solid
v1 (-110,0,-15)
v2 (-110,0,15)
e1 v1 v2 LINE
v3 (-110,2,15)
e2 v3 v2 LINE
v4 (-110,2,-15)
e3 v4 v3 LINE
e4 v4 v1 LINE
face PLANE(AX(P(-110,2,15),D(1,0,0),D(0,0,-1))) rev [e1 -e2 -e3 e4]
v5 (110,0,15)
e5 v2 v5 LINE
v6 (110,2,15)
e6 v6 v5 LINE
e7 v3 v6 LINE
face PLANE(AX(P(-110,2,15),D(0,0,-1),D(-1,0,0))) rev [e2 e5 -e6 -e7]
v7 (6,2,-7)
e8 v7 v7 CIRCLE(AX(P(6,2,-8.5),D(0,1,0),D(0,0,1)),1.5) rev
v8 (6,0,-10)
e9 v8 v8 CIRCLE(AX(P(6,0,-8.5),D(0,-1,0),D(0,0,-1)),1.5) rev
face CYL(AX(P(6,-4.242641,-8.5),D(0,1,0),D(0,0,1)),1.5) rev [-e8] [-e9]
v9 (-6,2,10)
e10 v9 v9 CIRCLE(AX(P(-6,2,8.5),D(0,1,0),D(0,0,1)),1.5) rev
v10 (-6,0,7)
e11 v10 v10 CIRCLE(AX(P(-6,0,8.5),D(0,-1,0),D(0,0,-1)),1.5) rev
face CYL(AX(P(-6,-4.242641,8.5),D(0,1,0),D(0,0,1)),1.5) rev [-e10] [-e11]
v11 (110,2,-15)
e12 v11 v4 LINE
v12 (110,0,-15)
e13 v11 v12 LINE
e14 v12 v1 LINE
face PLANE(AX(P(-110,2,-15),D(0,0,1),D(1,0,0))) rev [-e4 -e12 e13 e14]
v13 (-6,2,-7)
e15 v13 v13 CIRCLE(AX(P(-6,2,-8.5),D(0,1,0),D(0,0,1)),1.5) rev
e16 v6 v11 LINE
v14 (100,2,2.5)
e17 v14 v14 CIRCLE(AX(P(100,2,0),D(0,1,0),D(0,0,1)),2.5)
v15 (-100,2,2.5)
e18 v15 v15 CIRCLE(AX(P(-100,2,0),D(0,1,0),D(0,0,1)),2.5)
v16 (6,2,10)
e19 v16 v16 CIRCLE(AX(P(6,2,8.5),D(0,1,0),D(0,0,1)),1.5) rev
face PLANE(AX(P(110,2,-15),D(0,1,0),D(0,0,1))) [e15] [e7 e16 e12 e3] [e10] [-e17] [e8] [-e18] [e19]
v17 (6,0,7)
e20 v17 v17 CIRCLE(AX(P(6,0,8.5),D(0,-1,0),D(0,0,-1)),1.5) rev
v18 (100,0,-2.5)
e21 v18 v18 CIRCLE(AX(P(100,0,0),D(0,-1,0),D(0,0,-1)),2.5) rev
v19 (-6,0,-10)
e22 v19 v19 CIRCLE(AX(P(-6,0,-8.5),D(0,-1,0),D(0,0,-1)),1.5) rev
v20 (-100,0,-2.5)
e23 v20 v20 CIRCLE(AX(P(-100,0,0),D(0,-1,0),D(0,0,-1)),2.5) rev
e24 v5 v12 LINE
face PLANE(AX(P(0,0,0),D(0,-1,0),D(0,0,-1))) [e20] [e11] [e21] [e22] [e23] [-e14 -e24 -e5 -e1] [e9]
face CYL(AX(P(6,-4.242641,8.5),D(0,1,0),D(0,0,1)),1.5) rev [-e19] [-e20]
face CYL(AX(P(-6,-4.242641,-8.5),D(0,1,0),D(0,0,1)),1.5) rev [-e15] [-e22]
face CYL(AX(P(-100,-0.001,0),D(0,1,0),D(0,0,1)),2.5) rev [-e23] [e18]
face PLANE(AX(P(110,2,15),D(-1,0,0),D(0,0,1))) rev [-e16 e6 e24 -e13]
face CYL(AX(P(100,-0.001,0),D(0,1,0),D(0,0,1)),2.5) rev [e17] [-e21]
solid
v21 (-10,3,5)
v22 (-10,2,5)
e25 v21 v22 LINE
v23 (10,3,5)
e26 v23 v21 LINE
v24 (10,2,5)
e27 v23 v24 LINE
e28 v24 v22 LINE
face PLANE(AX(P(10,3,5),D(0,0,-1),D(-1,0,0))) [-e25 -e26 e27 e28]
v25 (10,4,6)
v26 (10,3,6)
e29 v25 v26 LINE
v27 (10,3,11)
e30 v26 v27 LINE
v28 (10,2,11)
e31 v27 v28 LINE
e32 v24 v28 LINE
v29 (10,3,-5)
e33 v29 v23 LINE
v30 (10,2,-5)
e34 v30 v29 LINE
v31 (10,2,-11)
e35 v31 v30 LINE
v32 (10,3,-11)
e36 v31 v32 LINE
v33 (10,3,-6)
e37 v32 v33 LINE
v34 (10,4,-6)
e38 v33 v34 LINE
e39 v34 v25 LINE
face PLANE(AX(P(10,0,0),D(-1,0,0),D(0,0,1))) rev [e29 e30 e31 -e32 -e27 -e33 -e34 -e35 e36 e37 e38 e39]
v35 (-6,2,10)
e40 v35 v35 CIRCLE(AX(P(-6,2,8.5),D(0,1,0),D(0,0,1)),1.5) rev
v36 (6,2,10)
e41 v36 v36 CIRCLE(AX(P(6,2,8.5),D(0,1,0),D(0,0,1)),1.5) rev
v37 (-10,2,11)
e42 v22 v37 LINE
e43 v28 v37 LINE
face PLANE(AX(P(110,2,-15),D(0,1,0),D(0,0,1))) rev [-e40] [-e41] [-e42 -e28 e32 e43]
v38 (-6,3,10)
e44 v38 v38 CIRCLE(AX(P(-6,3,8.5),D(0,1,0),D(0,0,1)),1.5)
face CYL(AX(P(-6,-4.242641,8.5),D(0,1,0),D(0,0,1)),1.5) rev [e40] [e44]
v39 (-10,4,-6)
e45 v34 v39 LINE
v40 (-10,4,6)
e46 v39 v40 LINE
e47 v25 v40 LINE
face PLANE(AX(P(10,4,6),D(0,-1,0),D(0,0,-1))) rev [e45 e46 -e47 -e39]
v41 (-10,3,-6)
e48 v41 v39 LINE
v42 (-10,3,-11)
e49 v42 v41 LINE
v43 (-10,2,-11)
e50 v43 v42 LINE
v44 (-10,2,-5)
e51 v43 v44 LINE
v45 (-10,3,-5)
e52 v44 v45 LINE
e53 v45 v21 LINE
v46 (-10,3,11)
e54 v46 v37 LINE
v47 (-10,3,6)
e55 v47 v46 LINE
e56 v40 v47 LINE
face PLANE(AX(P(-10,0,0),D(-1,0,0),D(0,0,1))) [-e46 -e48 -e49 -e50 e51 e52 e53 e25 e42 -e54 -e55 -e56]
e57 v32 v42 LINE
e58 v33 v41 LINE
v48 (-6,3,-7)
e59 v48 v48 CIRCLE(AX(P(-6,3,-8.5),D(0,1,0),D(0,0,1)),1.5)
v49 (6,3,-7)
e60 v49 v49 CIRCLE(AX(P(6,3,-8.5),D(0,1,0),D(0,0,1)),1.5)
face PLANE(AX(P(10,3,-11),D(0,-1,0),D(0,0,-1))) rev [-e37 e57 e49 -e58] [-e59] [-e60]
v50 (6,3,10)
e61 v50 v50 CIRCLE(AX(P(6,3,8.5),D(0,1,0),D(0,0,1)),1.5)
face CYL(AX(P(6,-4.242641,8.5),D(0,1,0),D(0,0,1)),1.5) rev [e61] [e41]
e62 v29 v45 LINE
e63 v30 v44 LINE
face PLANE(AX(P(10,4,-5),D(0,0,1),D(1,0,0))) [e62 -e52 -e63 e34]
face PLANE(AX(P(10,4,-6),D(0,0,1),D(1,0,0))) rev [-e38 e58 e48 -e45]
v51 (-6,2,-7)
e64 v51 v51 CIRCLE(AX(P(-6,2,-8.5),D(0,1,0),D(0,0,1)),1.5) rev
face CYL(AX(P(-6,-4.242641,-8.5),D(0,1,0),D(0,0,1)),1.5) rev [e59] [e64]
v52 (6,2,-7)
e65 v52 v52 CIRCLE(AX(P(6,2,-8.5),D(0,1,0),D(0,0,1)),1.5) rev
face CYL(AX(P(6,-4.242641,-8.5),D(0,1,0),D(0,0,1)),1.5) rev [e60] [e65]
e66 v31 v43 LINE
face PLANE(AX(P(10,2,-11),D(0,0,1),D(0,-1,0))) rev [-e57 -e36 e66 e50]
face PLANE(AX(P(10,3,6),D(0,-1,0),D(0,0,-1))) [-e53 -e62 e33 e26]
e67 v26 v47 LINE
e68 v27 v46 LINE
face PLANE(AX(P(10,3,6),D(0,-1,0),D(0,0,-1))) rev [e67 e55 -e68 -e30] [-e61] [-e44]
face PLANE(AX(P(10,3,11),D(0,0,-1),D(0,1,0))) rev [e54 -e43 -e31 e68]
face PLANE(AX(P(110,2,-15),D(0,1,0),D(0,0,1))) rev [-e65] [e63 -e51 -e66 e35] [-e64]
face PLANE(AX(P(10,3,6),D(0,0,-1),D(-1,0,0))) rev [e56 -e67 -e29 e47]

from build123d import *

# Parameters (mm, degrees)
SKETCH_1_W          = 220
SKETCH_1_H          = 30
EXTRUDE_1_DEPTH     = 2
EXTRUDE_START       = -10
EXTRUDE_1_2_DEPTH   = 20
SKETCH_3_R          = 1.5
CUT_EXTRUDE_1_DEPTH = 3
SKETCH_4_R          = 2.5
CUT_EXTRUDE_2_DEPTH = 2


# Read off the part's stored shape, not the designer's step: 拉伸-薄壁1, 分割1
with BuildPart() as part:
    # 草图1 → Extrude 1 (new body)
    with BuildSketch(Plane(origin=(0, 0, 0), x_dir=(1, 0, 0), z_dir=(0, 1, 0))):
        Rectangle(SKETCH_1_W, SKETCH_1_H)
    extrude(amount=EXTRUDE_1_DEPTH)

    # Extrude 1 2 outline → Extrude 1 2 (add)
    with BuildSketch(Plane(origin=(0, 0, 0), x_dir=(0, 0, -1), z_dir=(1, 0, 0)).offset(EXTRUDE_START)):
        Polygon((-11, 3), (-11, 2), (-5, 2), (-5, 3), (5, 3), (5, 2), (11, 2), (11, 3), (6, 3), (6, 4), (-6, 4), (-6, 3), align=None)
    extrude(amount=EXTRUDE_1_2_DEPTH)

    # 草图3 → 切除-拉伸1 (cut)
    with BuildSketch(Plane(origin=(0, 3, 0), x_dir=(1, 0, 0), z_dir=(0, 1, 0))):
        with Locations(Location((-6, 8.5, 0), (0, 0, 270))):
            Circle(SKETCH_3_R)
        with Locations(Location((6, 8.5, 0), (0, 0, 270))):
            Circle(SKETCH_3_R)
        with Locations(Location((-6, -8.5, 0), (0, 0, 270))):
            Circle(SKETCH_3_R)
        with Locations(Location((6, -8.5, 0), (0, 0, 270))):
            Circle(SKETCH_3_R)
    extrude(amount=-CUT_EXTRUDE_1_DEPTH, mode=Mode.SUBTRACT)


with BuildPart() as body_2:
    # Split Bodies 1: the piece on the far side of the plane
    add(part.part)
    split(bisect_by=Plane(origin=(0, 2, 0), x_dir=(1, 0, 0), z_dir=(0, 1, 0)), keep=Keep.BOTTOM)

    # 草图4 → 切除-拉伸2 (cut)
    with BuildSketch(Plane(origin=(0, 2, 0), x_dir=(1, 0, 0), z_dir=(0, 1, 0))):
        with Locations(Location((-100, 0, 0), (0, 0, 270))):
            Circle(SKETCH_4_R)
        with Locations(Location((100, 0, 0), (0, 0, 270))):
            Circle(SKETCH_4_R)
    extrude(amount=-CUT_EXTRUDE_2_DEPTH, mode=Mode.SUBTRACT)


with BuildPart() as part_1:
    add(part.part)

    # Split Bodies 1
    split(bisect_by=Plane(origin=(0, 2, 0), x_dir=(1, 0, 0), z_dir=(0, 1, 0)), keep=Keep.TOP)


solid = Compound([body_2.part, part_1.part])
